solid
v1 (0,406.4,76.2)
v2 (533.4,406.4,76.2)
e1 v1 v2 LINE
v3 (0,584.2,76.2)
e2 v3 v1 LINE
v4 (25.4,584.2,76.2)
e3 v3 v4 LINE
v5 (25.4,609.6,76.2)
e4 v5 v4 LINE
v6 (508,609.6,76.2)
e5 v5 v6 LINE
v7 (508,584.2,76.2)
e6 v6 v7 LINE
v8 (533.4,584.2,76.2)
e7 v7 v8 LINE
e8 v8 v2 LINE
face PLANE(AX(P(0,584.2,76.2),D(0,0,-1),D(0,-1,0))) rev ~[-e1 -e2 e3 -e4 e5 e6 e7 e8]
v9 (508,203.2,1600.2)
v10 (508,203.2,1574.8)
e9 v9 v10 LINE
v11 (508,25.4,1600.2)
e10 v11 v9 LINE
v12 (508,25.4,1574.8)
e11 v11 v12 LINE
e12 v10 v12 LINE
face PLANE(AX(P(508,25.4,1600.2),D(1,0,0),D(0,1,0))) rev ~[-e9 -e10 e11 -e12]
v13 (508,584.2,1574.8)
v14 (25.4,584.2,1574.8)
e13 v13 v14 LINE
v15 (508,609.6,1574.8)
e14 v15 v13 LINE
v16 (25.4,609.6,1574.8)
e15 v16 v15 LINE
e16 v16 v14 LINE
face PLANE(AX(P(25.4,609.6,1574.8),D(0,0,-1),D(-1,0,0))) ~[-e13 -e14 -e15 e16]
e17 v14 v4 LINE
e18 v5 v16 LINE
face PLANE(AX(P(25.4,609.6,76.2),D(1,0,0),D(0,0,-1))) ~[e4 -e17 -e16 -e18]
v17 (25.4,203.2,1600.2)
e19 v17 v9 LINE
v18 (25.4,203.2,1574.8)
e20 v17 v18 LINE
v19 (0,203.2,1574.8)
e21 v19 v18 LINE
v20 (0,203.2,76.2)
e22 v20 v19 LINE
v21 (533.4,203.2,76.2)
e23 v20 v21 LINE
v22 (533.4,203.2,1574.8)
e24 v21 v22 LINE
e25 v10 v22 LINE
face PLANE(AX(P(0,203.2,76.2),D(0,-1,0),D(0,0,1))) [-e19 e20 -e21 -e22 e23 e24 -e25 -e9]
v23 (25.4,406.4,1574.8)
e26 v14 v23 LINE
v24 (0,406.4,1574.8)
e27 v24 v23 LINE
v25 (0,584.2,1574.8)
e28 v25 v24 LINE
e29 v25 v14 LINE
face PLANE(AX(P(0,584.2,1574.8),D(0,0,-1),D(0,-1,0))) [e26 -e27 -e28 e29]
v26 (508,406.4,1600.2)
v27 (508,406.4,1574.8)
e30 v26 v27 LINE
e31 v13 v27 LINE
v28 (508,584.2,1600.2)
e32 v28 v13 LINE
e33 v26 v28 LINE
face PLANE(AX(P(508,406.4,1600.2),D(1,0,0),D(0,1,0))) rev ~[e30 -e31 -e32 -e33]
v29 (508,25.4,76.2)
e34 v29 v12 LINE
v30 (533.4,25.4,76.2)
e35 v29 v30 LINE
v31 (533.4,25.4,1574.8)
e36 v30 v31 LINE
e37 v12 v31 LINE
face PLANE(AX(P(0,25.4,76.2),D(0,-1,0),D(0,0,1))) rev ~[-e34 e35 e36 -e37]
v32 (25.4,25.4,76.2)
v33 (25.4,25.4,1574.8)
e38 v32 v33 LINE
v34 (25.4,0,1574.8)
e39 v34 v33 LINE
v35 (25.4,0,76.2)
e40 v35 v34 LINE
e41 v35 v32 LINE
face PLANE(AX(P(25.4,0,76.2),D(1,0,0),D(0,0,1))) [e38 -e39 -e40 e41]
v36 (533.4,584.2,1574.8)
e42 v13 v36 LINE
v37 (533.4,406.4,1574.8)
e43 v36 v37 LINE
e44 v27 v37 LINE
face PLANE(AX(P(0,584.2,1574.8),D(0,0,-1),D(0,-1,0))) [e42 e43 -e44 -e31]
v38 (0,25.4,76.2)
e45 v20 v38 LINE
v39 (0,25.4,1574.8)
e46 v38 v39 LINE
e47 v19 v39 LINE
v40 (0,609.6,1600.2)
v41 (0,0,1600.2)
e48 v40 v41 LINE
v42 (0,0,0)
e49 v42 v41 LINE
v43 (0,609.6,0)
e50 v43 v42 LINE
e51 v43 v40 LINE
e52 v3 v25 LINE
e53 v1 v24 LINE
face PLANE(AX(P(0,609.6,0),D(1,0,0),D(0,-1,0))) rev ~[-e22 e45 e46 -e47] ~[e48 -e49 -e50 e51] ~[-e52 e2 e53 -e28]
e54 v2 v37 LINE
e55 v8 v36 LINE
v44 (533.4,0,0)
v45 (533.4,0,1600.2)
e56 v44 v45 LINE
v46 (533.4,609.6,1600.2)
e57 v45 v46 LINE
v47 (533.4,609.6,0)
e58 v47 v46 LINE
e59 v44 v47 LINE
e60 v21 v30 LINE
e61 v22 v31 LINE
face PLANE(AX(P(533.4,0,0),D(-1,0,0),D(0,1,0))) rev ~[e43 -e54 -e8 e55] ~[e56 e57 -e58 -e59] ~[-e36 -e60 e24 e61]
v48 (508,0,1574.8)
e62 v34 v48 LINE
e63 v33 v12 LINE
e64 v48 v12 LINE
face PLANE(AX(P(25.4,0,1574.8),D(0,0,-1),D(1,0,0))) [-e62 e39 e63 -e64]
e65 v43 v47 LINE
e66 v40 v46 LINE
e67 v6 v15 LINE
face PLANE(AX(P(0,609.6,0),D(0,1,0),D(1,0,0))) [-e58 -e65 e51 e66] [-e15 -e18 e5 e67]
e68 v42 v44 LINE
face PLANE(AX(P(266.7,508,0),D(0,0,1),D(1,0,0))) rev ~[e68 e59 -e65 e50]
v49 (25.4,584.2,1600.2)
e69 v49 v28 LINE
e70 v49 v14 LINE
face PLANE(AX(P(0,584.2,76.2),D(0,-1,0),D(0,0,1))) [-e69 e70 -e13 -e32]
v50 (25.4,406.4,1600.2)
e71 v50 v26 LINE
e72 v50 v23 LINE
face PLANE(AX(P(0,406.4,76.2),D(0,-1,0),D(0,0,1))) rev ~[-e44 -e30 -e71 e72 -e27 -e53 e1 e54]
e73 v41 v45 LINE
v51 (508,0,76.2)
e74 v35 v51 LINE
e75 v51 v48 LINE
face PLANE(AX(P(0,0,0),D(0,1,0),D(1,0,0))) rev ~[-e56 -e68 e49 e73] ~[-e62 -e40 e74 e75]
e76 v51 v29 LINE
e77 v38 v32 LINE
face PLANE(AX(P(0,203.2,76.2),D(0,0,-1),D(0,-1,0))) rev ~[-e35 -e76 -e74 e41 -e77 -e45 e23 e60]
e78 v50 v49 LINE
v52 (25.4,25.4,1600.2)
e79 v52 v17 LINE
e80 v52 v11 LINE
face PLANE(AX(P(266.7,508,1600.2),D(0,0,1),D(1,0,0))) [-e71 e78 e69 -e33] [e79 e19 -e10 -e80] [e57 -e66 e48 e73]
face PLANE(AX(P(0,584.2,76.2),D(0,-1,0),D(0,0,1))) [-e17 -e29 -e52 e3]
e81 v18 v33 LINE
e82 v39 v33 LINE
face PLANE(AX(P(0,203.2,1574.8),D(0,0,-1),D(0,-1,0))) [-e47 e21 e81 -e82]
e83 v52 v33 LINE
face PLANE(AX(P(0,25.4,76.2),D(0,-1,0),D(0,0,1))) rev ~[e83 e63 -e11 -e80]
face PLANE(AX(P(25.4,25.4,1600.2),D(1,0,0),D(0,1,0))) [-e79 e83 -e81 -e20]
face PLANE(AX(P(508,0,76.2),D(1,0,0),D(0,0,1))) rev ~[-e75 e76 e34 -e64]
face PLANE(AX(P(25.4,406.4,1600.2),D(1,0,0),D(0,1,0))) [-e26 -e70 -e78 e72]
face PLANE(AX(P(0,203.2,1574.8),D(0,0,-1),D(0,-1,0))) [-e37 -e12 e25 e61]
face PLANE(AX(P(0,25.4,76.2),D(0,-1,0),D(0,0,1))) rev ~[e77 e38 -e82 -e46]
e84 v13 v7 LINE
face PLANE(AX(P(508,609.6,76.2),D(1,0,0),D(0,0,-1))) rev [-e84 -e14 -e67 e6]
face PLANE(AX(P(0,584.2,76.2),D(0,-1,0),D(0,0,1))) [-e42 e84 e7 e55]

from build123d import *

# Parameters (mm, degrees)
F0_W     = 533.4
F0_H     = 203.2
F1_DEPTH = 1600.2
F2_W     = 177.8
F2_H     = 1498.6
F3_DEPTH = 533.401
F4_W     = 482.6
F4_H     = 177.8
F5_DEPTH = 76.2
F6_W     = 482.6
F6_H     = 1498.6
F7_DEPTH = 50.8


# Not quite as in the source:
# - a pattern or mirror of a feature is missing from the dataset's text; its kind, count and spacing are read off the source's solid


with BuildPart() as f1:
    # F0 (on Top) → F1 (new body)
    with BuildSketch(Plane.XY):
        with Locations((266.7, 508)):
            Rectangle(F0_W, F0_H)
        with Locations((266.7, 101.6)):
            Rectangle(F0_W, F0_H)
        with Locations((266.7, 304.8)):
            Rectangle(F0_W, F0_H)
    extrude(amount=F1_DEPTH)

    # F2 (on face) → F3 (cut, through all)
    with BuildSketch(Plane(origin=(0, 0, 0), x_dir=(0, -1, 0), z_dir=(-1, 0, 0))):
        with Locations((-495.3, 825.5)):
            Rectangle(F2_W, F2_H)
        with Locations((-114.3, 825.5)):
            Rectangle(F2_W, F2_H)
    extrude(amount=-F3_DEPTH, mode=Mode.SUBTRACT)

    # F4 (on face) → F5 (cut)
    with BuildSketch(Plane.XY.offset(1600.2)):
        with Locations((266.7, 495.3)):
            Rectangle(F4_W, F4_H)
        with Locations((266.7, 114.3)):
            Rectangle(F4_W, F4_H)
    extrude(amount=-F5_DEPTH, mode=Mode.SUBTRACT)

    # F6 (on face) → F7 (cut)
    with BuildSketch(Plane.XZ):
        with Locations((266.7, 825.5)):
            Rectangle(F6_W, F6_H)
    f7 = extrude(amount=-F7_DEPTH, mode=Mode.SUBTRACT)

    # F7_copies: F7 across plane
    add(f7.mirror(Plane.ZX.offset(304.8)), mode=Mode.SUBTRACT)


solid = f1.part
